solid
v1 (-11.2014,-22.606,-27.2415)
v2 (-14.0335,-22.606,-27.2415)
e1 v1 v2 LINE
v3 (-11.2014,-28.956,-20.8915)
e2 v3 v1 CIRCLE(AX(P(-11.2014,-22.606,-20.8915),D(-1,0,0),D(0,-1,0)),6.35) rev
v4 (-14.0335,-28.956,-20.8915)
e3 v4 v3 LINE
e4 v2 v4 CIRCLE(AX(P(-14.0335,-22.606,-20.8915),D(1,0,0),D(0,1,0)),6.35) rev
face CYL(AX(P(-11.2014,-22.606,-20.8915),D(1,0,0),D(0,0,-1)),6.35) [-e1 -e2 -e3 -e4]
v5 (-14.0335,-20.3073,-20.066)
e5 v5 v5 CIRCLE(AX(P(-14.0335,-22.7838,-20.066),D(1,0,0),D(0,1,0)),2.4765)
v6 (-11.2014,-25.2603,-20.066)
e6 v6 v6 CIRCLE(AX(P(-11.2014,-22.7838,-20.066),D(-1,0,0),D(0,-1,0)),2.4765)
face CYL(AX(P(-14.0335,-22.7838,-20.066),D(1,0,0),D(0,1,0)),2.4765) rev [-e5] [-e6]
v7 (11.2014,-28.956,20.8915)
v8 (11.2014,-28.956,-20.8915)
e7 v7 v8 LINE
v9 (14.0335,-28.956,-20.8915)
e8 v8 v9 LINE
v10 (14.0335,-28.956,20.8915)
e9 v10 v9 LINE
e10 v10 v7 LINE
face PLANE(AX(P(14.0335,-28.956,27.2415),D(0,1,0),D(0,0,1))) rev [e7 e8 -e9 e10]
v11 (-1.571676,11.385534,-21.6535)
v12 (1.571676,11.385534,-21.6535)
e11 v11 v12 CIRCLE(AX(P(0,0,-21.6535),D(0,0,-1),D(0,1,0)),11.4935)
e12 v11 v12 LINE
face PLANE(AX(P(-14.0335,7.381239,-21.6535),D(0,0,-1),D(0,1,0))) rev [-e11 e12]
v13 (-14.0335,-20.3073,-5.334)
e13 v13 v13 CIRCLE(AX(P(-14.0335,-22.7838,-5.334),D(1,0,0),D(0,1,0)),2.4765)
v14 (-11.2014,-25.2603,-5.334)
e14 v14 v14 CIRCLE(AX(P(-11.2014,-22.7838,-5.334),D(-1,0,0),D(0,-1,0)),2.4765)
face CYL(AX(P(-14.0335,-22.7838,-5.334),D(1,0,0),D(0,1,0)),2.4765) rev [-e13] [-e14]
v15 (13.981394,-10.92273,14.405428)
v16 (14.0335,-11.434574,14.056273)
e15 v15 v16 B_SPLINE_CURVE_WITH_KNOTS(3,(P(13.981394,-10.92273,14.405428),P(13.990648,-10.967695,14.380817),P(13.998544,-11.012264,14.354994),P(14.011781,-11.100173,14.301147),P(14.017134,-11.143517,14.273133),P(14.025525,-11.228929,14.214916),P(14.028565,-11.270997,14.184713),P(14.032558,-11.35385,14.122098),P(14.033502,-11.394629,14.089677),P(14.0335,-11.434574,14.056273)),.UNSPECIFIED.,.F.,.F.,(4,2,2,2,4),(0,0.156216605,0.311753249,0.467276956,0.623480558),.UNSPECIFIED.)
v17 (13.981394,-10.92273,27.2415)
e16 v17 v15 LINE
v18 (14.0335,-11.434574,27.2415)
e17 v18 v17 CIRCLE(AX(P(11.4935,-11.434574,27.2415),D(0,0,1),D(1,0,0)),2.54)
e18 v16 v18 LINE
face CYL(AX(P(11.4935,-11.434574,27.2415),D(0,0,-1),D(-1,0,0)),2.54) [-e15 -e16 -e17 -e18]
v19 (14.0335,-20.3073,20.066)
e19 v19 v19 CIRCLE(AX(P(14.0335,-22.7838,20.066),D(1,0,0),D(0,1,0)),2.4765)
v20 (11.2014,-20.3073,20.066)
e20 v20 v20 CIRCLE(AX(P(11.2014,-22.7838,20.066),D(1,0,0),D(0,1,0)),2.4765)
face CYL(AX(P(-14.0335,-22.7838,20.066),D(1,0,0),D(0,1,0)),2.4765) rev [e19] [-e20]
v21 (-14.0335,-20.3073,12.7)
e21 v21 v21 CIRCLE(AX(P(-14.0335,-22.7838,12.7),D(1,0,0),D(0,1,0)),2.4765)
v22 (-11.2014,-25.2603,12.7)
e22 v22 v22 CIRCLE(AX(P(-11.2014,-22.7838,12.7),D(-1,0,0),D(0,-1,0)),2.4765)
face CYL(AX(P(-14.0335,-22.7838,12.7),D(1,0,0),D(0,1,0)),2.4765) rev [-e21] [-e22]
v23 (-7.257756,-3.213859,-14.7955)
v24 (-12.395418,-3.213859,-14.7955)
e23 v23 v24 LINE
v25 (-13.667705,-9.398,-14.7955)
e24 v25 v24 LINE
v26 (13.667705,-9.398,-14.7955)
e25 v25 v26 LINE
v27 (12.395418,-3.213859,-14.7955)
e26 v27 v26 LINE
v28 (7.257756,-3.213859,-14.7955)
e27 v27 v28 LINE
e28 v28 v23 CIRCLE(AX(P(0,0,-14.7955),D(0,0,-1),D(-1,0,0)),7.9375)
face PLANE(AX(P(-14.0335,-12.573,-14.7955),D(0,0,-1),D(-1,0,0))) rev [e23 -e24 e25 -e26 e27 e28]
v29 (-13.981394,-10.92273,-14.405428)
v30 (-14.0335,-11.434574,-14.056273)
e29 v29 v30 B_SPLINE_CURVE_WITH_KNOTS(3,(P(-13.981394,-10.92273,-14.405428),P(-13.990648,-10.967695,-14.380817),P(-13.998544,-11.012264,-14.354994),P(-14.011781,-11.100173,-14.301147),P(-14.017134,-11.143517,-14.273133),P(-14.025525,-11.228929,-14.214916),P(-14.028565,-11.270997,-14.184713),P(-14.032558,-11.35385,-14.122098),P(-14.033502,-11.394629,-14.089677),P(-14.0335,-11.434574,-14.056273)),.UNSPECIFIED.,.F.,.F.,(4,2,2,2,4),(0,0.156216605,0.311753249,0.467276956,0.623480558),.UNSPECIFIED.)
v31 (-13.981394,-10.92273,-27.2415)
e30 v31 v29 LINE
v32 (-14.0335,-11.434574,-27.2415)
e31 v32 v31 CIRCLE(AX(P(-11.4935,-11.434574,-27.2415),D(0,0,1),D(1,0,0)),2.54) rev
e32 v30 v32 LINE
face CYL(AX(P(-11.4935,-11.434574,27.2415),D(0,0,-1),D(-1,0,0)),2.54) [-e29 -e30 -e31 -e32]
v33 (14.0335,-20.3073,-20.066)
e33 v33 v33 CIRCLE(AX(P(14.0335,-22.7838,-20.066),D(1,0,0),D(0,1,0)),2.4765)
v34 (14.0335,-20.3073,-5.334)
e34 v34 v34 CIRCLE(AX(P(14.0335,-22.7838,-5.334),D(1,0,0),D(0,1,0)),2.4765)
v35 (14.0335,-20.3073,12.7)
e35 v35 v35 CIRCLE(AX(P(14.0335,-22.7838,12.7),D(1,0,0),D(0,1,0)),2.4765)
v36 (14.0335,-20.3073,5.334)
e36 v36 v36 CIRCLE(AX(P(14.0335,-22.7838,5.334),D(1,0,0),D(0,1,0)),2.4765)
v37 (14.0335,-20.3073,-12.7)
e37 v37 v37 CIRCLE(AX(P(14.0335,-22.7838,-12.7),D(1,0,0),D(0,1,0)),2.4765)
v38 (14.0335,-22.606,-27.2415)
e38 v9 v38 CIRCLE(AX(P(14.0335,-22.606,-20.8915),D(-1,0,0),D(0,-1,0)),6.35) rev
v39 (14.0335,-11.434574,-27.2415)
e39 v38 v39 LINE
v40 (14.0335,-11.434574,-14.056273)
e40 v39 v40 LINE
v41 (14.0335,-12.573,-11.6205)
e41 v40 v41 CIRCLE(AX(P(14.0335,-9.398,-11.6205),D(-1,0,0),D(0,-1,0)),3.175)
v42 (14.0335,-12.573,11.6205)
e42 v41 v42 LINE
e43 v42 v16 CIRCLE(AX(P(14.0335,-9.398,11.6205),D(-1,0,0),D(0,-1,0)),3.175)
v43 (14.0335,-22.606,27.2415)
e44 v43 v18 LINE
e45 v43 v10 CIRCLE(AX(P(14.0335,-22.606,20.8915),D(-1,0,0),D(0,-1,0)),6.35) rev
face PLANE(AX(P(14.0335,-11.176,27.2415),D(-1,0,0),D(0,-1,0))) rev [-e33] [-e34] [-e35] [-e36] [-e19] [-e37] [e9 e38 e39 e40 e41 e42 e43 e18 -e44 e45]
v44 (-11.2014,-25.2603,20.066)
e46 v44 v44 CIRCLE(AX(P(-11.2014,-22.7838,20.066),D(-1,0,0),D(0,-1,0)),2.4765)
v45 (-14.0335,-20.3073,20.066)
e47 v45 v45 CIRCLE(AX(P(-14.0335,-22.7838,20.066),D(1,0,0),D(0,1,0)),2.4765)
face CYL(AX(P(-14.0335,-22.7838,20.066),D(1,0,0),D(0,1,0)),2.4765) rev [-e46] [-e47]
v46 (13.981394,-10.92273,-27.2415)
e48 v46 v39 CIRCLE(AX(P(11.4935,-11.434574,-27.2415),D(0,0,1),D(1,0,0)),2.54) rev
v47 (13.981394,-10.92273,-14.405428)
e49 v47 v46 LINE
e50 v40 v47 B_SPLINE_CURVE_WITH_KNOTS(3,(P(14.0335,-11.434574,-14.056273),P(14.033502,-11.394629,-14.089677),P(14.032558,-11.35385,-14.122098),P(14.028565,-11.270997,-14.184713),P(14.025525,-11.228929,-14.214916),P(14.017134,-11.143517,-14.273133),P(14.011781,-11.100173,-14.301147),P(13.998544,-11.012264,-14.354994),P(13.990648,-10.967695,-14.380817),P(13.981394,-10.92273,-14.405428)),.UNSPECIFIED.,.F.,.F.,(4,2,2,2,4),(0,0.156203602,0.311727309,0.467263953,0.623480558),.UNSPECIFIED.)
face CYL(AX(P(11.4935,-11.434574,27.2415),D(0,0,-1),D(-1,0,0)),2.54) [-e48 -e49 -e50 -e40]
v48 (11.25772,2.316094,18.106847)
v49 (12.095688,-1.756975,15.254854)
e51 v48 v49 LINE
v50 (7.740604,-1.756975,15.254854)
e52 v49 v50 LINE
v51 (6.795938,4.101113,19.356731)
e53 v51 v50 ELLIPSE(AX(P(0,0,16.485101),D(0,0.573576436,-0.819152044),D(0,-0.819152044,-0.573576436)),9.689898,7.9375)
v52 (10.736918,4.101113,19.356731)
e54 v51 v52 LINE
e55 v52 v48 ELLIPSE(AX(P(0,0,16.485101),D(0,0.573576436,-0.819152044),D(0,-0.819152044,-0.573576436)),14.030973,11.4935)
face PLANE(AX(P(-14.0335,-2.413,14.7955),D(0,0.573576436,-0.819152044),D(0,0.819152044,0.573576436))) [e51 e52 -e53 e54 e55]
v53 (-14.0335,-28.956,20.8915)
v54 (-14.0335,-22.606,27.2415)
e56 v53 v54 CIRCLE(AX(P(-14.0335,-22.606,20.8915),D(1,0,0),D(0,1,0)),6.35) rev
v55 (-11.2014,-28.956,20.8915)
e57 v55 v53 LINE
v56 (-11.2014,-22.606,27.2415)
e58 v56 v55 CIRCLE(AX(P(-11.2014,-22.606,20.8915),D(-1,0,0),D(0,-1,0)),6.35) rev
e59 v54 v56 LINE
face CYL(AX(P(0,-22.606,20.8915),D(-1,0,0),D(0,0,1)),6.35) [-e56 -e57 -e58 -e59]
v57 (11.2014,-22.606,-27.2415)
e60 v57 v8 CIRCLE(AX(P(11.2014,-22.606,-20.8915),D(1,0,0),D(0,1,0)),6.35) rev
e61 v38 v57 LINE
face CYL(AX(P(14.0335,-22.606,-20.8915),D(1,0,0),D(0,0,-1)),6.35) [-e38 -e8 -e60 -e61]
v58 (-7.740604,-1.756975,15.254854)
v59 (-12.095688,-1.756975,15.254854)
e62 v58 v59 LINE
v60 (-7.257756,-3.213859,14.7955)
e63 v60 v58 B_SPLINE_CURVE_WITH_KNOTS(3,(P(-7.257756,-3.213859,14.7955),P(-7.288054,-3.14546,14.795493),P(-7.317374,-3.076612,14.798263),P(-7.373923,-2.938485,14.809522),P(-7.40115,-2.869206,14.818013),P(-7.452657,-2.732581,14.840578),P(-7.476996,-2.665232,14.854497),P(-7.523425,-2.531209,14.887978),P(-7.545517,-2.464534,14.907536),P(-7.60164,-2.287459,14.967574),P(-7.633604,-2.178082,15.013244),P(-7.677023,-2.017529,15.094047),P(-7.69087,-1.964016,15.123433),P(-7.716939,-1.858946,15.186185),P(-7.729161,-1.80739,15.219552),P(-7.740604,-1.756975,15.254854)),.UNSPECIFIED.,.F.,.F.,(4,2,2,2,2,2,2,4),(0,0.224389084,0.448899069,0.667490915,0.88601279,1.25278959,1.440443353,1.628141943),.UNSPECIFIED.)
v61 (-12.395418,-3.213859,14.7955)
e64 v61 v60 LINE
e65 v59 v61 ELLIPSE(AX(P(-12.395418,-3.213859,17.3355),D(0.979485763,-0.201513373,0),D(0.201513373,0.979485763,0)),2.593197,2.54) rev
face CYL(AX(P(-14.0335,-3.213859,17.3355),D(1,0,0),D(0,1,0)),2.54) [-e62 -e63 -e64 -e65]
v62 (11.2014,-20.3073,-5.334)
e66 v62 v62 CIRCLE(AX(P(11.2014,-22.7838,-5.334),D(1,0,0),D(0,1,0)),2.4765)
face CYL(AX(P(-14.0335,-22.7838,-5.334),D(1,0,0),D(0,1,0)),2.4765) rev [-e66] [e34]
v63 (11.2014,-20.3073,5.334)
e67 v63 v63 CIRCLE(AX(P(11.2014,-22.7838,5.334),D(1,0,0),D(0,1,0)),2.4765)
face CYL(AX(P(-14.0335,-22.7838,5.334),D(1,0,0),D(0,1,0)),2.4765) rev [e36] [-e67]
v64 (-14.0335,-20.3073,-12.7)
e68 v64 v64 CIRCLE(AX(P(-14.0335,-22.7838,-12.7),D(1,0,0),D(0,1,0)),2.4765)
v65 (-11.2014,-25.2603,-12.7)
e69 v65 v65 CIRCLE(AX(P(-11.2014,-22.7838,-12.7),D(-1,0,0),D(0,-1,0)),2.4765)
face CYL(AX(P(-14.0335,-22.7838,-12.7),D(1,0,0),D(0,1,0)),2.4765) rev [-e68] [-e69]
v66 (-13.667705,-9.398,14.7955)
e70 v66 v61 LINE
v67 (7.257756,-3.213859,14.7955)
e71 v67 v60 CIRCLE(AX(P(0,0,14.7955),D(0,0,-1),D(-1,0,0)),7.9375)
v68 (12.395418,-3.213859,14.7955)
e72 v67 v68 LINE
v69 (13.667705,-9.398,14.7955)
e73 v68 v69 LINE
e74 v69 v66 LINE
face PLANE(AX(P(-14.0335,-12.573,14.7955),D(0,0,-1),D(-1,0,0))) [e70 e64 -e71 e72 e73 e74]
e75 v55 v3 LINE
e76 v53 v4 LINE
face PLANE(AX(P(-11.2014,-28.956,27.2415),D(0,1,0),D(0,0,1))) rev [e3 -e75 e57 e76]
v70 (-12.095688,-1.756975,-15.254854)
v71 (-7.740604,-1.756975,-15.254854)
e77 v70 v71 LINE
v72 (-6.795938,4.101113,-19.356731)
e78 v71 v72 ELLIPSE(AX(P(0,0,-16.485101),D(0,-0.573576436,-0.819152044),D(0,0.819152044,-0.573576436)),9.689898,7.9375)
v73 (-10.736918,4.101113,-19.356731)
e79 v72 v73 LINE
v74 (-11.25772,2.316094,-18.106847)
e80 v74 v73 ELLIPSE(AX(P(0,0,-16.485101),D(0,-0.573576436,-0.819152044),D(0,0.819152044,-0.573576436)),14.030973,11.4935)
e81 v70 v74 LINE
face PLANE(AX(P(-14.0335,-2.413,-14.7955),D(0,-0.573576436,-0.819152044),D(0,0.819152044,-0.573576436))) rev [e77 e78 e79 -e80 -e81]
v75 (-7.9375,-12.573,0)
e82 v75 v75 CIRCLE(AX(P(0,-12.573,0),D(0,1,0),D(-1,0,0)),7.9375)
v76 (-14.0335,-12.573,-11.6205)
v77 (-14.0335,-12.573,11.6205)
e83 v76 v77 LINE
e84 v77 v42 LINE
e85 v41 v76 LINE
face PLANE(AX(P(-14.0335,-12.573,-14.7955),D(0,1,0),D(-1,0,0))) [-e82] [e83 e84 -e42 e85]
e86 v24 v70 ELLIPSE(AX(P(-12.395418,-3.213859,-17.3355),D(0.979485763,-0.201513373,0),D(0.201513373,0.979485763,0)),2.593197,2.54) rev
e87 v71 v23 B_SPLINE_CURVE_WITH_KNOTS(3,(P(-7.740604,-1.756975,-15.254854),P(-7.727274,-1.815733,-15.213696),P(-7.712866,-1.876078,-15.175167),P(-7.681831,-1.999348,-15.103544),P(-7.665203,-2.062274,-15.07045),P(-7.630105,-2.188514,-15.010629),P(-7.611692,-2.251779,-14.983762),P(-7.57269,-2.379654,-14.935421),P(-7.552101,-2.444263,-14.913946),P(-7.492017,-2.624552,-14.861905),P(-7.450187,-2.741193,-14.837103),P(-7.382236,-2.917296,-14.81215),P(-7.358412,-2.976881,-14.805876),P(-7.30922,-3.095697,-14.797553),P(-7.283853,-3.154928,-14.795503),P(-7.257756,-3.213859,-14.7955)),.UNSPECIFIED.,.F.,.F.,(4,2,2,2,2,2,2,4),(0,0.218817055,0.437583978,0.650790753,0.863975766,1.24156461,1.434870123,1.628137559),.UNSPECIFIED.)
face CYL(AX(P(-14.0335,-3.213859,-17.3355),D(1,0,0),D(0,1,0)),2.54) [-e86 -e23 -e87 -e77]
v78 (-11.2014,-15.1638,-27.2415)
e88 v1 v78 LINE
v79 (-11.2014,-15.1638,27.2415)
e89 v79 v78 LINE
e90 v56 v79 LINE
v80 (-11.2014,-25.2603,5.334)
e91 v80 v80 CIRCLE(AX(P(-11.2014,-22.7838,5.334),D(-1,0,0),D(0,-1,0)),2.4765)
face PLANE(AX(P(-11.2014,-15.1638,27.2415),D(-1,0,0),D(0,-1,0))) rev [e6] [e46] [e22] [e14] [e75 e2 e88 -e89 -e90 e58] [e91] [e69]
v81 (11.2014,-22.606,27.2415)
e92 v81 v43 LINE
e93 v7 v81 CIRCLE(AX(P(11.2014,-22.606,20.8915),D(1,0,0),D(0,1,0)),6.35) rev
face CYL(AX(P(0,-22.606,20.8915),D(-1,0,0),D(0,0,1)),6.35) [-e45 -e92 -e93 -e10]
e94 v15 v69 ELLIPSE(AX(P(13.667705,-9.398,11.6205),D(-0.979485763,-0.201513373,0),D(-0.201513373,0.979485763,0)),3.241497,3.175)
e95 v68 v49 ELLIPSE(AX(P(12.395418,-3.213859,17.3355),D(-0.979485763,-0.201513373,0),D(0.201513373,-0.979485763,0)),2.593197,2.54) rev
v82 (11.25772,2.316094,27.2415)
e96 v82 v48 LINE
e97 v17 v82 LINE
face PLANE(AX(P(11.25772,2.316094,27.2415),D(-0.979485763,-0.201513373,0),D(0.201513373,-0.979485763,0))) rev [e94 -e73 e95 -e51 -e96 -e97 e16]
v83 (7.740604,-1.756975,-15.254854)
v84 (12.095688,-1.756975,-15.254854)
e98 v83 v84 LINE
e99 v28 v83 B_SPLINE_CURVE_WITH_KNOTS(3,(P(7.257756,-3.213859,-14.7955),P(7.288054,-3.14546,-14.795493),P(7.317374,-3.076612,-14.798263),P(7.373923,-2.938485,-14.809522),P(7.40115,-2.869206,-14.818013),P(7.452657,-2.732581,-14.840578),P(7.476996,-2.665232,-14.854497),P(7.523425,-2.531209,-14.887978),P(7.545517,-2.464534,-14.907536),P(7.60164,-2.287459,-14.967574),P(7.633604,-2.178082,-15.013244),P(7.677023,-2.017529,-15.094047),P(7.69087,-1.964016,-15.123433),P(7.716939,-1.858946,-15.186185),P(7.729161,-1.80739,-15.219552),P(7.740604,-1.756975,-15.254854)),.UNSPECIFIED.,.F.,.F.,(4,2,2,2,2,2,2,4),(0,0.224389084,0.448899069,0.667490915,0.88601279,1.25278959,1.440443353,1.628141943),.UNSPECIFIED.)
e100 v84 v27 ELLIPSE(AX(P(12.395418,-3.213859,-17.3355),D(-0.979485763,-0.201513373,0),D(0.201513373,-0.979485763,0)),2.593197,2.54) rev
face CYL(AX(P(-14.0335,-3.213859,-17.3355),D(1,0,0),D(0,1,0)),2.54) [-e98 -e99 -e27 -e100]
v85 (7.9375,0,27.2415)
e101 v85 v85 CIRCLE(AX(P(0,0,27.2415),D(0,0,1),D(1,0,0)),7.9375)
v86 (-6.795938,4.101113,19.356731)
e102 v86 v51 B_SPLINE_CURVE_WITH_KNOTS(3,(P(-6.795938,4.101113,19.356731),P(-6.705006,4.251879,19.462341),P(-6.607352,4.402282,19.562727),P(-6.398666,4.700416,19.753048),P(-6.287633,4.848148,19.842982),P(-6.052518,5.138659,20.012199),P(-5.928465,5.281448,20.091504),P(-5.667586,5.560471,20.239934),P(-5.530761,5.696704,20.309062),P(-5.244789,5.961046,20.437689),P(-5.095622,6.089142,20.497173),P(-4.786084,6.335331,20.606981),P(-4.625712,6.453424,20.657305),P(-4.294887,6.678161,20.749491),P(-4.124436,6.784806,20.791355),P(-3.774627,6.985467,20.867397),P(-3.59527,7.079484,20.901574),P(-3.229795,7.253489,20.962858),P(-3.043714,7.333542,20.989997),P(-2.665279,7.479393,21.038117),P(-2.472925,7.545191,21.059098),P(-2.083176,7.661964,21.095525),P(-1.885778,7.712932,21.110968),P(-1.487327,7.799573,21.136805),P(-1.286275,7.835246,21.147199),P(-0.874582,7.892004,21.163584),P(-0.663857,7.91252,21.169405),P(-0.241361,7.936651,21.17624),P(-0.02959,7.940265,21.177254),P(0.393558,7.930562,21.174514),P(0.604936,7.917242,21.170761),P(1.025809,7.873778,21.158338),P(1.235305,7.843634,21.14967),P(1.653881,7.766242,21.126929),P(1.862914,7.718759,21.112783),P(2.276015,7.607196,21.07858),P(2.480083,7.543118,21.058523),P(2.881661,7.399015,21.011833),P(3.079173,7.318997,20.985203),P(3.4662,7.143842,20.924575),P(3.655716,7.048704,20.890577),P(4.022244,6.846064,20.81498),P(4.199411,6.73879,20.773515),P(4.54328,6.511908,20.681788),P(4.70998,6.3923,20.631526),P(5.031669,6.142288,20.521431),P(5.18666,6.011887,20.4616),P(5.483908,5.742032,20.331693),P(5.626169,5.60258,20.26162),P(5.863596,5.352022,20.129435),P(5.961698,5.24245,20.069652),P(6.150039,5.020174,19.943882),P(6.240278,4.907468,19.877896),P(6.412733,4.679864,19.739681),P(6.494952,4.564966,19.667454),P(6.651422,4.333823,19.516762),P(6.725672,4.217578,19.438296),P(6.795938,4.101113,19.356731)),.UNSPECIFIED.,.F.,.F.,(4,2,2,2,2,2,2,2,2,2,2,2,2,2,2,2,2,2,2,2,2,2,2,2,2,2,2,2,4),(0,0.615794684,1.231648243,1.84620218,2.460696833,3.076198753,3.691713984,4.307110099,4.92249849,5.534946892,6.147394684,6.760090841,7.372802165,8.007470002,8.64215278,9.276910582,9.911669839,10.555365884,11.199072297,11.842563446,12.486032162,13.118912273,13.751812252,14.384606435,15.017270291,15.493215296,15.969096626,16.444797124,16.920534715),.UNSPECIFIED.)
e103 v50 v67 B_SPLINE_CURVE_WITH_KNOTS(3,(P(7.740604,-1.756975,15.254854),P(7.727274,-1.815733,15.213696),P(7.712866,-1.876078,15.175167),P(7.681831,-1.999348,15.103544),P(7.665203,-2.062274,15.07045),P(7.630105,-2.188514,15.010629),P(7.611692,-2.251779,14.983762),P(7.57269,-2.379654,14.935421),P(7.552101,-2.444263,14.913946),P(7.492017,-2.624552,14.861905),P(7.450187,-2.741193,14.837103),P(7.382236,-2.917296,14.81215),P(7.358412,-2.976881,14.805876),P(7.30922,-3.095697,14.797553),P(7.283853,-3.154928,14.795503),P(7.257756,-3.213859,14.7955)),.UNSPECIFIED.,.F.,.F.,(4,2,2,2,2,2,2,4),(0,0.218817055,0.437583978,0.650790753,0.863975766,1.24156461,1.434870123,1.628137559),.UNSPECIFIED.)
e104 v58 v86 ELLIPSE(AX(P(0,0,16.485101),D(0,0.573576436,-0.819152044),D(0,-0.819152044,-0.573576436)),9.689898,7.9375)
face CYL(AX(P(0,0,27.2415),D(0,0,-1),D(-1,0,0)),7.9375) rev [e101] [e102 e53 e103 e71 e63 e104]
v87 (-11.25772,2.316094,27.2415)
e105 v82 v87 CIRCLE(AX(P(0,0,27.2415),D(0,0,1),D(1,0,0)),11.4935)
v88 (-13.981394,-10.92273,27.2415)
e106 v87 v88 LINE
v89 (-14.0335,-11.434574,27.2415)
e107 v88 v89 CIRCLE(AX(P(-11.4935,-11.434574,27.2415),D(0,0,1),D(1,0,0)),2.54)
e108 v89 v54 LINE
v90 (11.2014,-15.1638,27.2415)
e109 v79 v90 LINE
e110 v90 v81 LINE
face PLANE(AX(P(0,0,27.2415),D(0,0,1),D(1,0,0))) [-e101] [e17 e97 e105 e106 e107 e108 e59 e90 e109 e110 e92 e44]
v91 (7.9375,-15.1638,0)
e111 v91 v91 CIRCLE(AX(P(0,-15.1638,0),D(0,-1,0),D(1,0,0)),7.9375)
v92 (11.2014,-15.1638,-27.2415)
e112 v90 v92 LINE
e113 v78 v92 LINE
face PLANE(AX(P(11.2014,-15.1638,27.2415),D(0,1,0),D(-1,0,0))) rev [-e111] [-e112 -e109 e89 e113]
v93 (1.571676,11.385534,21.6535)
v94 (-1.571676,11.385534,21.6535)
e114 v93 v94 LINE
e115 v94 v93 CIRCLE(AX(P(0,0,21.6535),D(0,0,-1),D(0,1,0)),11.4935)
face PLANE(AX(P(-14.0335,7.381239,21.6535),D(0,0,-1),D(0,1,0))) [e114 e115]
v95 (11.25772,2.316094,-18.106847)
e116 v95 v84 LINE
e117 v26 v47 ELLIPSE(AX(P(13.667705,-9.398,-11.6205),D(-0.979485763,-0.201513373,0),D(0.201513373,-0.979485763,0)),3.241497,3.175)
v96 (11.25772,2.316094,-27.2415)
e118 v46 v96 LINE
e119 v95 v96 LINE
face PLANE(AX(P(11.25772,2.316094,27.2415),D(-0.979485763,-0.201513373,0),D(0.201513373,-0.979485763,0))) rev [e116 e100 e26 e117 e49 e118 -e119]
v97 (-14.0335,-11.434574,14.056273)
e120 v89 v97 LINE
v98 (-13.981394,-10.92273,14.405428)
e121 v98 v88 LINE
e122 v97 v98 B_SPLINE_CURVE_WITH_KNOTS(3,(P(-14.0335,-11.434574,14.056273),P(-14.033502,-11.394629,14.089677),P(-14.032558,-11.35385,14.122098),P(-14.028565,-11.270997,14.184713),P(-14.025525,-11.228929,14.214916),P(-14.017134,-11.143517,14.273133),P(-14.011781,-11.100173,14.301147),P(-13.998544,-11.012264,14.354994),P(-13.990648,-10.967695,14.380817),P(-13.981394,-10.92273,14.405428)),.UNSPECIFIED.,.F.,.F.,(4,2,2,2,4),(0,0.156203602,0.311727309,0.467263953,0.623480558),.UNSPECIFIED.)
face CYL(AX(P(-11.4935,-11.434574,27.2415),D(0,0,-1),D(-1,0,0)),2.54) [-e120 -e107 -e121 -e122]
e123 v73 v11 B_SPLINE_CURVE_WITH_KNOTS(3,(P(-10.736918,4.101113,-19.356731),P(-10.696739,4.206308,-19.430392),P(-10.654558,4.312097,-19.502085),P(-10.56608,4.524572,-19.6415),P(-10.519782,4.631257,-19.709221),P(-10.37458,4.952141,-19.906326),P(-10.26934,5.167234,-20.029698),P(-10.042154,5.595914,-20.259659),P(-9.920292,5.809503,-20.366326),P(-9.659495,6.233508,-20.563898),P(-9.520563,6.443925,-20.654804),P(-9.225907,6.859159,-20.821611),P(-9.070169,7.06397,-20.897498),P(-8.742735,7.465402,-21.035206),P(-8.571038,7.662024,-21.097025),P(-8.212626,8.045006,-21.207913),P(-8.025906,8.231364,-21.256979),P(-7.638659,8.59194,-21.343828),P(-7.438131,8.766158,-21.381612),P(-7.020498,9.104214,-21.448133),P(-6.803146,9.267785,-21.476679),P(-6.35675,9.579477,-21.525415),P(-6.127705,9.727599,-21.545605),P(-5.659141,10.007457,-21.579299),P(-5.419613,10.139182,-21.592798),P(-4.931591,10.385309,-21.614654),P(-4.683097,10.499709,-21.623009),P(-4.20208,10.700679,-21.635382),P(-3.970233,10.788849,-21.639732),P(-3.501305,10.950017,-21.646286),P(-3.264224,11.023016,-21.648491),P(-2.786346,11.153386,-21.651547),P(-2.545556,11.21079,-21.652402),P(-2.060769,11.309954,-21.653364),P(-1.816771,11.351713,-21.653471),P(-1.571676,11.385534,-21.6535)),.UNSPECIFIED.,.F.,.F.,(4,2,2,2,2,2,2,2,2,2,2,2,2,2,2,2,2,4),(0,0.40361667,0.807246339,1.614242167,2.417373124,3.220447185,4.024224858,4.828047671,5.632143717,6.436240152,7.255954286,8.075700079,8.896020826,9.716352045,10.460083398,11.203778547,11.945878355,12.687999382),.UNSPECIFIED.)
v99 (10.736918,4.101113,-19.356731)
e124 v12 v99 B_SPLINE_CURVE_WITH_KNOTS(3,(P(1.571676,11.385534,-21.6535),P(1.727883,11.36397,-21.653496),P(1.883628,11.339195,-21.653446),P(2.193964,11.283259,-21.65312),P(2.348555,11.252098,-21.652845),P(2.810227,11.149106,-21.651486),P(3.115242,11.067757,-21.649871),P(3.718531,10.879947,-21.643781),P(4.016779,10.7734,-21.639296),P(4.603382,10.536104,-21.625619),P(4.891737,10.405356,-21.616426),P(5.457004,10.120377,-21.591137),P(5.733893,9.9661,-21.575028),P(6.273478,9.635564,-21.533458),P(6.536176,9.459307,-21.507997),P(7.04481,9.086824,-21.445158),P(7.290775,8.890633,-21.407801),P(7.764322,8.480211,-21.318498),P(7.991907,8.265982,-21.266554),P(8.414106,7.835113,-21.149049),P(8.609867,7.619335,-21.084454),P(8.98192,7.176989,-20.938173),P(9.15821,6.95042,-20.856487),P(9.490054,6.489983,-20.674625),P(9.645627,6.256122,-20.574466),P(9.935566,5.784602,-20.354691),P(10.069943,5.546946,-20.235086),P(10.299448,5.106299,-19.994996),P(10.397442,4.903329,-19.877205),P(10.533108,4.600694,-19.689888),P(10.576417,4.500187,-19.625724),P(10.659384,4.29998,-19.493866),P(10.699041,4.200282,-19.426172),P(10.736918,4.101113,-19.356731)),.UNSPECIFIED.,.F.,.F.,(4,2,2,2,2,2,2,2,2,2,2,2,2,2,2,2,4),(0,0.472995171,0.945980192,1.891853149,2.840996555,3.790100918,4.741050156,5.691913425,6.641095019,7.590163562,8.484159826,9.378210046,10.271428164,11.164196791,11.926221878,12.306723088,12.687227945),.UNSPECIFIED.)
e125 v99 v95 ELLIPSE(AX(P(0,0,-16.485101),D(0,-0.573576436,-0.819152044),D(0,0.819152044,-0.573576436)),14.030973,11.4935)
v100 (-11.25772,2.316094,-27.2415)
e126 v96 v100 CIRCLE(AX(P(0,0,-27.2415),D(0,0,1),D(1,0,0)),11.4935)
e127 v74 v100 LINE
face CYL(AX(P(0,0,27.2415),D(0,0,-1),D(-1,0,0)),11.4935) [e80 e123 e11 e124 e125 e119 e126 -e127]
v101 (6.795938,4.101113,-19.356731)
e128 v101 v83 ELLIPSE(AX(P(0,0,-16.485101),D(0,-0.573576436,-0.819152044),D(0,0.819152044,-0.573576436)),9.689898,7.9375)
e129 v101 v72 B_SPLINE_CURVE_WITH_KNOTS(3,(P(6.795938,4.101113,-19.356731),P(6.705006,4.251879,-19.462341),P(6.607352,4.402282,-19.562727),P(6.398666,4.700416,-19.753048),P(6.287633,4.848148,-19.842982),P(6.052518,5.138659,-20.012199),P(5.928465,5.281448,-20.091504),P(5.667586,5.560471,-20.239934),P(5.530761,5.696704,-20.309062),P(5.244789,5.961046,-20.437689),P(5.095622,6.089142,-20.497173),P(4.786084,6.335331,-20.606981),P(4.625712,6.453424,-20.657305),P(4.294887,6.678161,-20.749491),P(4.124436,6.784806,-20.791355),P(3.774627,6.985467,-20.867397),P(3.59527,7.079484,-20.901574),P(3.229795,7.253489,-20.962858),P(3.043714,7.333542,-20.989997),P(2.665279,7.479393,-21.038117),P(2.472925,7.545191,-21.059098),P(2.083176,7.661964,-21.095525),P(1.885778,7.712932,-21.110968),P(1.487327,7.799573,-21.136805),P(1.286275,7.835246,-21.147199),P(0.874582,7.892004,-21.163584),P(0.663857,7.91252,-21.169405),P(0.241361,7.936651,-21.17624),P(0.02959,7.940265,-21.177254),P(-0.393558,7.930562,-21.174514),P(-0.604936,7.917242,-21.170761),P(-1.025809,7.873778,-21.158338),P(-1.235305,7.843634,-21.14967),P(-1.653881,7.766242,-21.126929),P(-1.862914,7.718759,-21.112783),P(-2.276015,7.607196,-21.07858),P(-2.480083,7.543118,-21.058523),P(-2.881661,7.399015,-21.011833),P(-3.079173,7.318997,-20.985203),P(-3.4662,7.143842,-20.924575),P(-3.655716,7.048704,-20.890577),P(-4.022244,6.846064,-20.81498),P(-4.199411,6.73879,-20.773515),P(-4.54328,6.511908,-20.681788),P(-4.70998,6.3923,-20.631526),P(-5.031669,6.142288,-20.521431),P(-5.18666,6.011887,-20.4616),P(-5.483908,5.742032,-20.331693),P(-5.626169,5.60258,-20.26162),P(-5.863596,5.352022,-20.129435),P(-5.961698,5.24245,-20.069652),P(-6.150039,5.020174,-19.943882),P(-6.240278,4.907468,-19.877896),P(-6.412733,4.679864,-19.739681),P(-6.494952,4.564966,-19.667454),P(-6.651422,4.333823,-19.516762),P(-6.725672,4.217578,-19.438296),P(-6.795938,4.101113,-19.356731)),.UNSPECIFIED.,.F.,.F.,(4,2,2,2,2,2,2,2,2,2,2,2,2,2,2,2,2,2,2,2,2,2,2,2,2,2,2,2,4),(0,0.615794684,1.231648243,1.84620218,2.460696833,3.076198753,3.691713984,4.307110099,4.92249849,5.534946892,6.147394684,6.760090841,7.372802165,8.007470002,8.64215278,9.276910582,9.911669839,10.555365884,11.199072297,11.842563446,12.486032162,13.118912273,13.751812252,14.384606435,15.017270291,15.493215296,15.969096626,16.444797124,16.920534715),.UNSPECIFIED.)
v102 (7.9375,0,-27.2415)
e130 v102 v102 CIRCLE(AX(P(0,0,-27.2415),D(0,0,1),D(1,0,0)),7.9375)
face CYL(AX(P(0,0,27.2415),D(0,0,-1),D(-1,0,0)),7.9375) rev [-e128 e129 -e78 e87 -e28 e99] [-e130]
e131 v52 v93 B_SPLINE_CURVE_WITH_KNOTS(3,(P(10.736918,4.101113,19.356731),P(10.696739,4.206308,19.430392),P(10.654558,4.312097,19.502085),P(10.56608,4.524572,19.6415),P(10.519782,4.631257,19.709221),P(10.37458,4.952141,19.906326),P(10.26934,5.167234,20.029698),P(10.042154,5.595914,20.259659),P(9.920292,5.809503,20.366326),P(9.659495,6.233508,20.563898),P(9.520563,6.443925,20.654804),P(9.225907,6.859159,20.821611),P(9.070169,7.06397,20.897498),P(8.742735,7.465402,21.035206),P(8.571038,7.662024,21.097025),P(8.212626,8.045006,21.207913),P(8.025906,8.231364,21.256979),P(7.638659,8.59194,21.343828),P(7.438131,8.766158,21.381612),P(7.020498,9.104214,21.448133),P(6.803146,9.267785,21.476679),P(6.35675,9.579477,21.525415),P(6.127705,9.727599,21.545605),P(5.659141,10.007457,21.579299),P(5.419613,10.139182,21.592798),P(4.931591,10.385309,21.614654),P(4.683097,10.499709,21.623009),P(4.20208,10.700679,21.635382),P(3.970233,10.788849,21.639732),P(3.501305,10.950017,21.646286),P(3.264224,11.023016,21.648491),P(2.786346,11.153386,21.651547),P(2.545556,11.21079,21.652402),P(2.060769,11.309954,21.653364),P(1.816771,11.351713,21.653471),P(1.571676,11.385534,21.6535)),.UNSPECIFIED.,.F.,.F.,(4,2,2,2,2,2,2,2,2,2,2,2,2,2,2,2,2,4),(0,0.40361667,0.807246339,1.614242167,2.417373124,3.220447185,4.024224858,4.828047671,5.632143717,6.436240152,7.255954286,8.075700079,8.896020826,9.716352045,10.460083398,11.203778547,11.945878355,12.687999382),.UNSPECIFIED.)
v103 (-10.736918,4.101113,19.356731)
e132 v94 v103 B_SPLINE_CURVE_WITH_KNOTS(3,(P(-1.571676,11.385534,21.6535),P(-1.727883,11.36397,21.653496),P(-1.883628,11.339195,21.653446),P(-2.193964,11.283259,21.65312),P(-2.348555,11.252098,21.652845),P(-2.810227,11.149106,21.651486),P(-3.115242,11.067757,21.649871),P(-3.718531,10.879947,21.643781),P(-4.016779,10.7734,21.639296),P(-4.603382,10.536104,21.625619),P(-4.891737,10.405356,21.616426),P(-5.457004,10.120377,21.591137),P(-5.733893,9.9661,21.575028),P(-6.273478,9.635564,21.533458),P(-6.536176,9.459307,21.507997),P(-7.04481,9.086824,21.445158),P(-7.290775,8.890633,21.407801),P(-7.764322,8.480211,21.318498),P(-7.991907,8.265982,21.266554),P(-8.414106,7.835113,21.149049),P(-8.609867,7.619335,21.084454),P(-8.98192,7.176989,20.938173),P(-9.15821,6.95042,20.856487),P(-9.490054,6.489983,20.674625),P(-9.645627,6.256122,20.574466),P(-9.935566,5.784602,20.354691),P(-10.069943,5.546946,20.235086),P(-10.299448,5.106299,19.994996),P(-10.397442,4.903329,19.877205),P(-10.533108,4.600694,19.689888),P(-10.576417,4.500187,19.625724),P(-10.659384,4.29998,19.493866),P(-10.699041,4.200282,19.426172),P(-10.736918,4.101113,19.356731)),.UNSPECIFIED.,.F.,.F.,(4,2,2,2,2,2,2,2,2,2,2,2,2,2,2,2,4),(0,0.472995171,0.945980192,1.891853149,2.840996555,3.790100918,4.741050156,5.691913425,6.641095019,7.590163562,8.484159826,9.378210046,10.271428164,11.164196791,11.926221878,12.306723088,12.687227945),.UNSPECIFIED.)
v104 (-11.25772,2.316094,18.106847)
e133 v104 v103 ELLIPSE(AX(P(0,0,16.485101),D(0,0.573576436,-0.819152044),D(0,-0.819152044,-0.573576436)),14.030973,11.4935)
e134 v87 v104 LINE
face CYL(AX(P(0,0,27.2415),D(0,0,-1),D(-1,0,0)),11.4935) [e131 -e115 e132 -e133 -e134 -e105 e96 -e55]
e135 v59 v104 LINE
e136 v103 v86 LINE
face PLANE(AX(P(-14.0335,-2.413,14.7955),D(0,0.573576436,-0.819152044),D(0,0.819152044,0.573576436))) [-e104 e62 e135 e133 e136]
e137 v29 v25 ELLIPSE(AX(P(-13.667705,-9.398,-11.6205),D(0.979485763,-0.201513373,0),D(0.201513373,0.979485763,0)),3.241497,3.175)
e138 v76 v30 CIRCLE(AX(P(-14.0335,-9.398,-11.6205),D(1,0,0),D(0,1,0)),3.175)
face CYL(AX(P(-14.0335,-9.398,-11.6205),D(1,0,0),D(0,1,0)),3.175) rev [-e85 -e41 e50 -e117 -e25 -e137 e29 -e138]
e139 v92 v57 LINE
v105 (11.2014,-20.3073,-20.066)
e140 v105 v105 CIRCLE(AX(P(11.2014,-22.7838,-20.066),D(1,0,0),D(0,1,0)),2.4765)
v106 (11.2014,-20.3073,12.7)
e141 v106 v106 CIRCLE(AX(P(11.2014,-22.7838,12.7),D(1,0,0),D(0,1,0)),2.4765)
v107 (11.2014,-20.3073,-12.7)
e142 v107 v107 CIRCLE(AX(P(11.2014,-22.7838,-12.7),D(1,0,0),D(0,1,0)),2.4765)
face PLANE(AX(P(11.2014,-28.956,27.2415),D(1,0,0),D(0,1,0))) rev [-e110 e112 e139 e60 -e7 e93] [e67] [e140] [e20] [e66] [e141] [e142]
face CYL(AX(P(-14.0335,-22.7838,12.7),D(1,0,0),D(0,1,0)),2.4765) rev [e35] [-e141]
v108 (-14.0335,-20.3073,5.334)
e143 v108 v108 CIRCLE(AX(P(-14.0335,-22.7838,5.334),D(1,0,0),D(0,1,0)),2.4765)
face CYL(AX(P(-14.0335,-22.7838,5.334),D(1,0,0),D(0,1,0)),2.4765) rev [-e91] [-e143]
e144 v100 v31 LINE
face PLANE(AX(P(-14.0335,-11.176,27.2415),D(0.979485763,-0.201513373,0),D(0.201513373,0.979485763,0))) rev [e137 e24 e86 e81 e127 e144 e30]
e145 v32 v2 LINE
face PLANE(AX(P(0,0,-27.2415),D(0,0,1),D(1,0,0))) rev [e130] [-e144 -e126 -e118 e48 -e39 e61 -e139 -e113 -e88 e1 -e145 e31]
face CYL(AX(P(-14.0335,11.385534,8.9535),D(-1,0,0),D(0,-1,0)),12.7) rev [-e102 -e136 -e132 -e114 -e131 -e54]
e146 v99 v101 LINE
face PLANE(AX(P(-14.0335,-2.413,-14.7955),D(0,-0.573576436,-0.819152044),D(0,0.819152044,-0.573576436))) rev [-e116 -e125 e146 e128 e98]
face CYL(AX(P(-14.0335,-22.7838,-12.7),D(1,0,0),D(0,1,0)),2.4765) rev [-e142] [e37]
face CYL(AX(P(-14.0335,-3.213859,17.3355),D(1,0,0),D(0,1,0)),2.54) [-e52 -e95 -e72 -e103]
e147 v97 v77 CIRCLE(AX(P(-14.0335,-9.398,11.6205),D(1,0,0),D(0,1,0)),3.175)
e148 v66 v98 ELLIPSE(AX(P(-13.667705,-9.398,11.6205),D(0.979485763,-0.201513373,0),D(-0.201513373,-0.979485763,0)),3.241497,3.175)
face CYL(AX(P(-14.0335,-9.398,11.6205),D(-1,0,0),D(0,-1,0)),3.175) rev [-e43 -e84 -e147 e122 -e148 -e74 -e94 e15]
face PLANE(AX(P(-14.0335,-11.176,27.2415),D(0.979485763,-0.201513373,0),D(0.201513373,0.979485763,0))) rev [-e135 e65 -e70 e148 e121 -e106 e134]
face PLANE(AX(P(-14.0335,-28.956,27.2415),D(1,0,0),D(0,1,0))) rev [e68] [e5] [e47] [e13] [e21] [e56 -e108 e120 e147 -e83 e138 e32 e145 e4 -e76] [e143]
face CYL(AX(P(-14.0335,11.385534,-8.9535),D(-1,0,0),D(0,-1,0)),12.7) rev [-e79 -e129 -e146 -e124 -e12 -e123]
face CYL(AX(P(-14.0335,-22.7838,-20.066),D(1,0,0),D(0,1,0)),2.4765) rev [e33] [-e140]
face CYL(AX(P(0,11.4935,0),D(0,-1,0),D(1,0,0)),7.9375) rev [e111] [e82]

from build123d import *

# Parameters (mm, degrees)
SKETCH1_R           = 7.9375
BOSS_EXTRUDE1_DEPTH = 27.2415
SKETCH2_R           = 2.4765
CUT_EXTRUDE1_DEPTH  = 49.665241675
CUT_EXTRUDE2_DEPTH  = 49.665241675
SKETCH4_R           = 7.9375
CUT_EXTRUDE3_DEPTH  = 41.615884673
FILLET1_R           = 6.35
FILLET2_R           = 3.175
FILLET3_R           = 12.7
FILLET4_R           = 2.54
FILLET5_R           = 2.54


with BuildPart() as part:
    # Sketch1 → Boss-Extrude1 (new, symmetric)
    with BuildSketch(Plane.XY):
        with BuildLine():
            Line((11.25771962, 2.316093955), (14.0335, -11.176))
            Line((14.0335, -11.176), (14.0335, -28.956))
            Line((14.0335, -28.956), (11.2014, -28.956))
            Line((11.2014, -28.956), (11.2014, -15.1638))
            Line((11.2014, -15.1638), (-11.2014, -15.1638))
            Line((-11.2014, -15.1638), (-11.2014, -28.956))
            Line((-11.2014, -28.956), (-14.0335, -28.956))
            Line((-14.0335, -28.956), (-14.0335, -11.176))
            Line((-14.0335, -11.176), (-11.25771962, 2.316093955))
            ThreePointArc((-11.25771962, 2.316093955), (0, 11.4935), (11.25771962, 2.316093955))
        make_face()
        Circle(SKETCH1_R, mode=Mode.SUBTRACT)
    extrude(amount=BOSS_EXTRUDE1_DEPTH, both=True)

    # Sketch2 → Cut-Extrude1 (cut, through all)
    with BuildSketch(Plane(origin=(14.0335, 0, 0), x_dir=(0, 0, -1), z_dir=(1, 0, 0))):
        with Locations(Location((-20.066, -22.7838, 0), (0, 0, 90))):
            Circle(SKETCH2_R)
        with Locations(Location((-12.7, -22.7838, 0), (0, 0, 90))):
            Circle(SKETCH2_R)
        with Locations(Location((-5.334, -22.7838, 0), (0, 0, 90))):
            Circle(SKETCH2_R)
        with Locations(Location((5.334, -22.7838, 0), (0, 0, 90))):
            Circle(SKETCH2_R)
        with Locations(Location((12.7, -22.7838, 0), (0, 0, 90))):
            Circle(SKETCH2_R)
        with Locations(Location((20.066, -22.7838, 0), (0, 0, 90))):
            Circle(SKETCH2_R)
    extrude(amount=-CUT_EXTRUDE1_DEPTH, mode=Mode.SUBTRACT)

    # Sketch3 → Cut-Extrude2 (cut, through all)
    with BuildSketch(Plane(origin=(14.0335, 0, 0), x_dir=(0, 0, -1), z_dir=(1, 0, 0))):
        Polygon((14.7955, -12.573), (-14.7955, -12.573), (-14.7955, -2.413), (-21.6535, 7.38123903), (-21.6535, 11.4935), (21.6535, 11.4935), (21.6535, 7.38123903), (14.7955, -2.413), align=None)
    extrude(amount=-CUT_EXTRUDE2_DEPTH, mode=Mode.SUBTRACT)

    # Sketch4 → Cut-Extrude3 (cut, through all)
    with BuildSketch(Plane.XZ.offset(15.1638)):
        Circle(SKETCH4_R)
    extrude(amount=-CUT_EXTRUDE3_DEPTH, mode=Mode.SUBTRACT)

    # Fillet1
    fillet1_edges = [part.edges().sort_by_distance(p)[0] for p in [
        (12.61745, -28.956, -27.2415),
        (-12.61745, -28.956, -27.2415),
        (-12.61745, -28.956, 27.2415),
        (12.61745, -28.956, 27.2415),
    ]]
    fillet(fillet1_edges, radius=FILLET1_R)

    # Fillet2
    fillet2_edges = [part.edges().sort_by_distance(p)[0] for p in [
        (0, -12.573, 14.7955),
        (0, -12.573, -14.7955),
    ]]
    fillet(fillet2_edges, radius=FILLET2_R)

    # Fillet3
    # the kernel refuses this fillet: 12.7 mm, written as the material it adds along each edge
    with BuildSketch(Plane(origin=(18.820836014, 7.38123903, 21.6535), x_dir=(0, -0.8191520442889931, -0.5735764363510439), z_dir=(-1, 0, 0))) as fillet3_piece_1_section:
        with BuildLine():
            CenterArc((FILLET3_R * 0.315298788879, -FILLET3_R), FILLET3_R, 90, 35)
            Line((-FILLET3_R * 0.258277647472, -FILLET3_R * 0.180847955711), (0, 0))
            Line((0, 0), (FILLET3_R * 0.315298788879, 0))
        make_face()
    fillet3_piece_1 = extrude(amount=25.91246026, mode=Mode.PRIVATE)
    fillet3_piece_1 = fillet3_piece_1 & Plane(origin=(0, 0, 21.359418529), x_dir=(-0.9794857632595162, 0.20151337318382392, 0), z_dir=(0, 0, 1)) * Cylinder(11.4935, 68, mode=Mode.PRIVATE)
    fillet3_piece_1 = fillet3_piece_1 - Plane(origin=(0, 0, 21.359418529), x_dir=(1, 0, 0), z_dir=(0, 0, -1)) * Cylinder(7.9375, 68, mode=Mode.PRIVATE)
    add(fillet3_piece_1)
    with BuildSketch(Plane(origin=(7.091624245, 7.38123903, 21.6535), x_dir=(0, -0.8191520442889934, -0.5735764363510438), z_dir=(-1, 0, 0))) as fillet3_piece_2_section:
        with BuildLine():
            CenterArc((FILLET3_R * 0.315298788879, -FILLET3_R), FILLET3_R, 90, 35)
            Line((-FILLET3_R * 0.258277647472, -FILLET3_R * 0.180847955711), (0, 0))
            Line((0, 0), (FILLET3_R * 0.315298788879, 0))
        make_face()
    fillet3_piece_2 = extrude(amount=25.91246026, mode=Mode.PRIVATE)
    fillet3_piece_2 = fillet3_piece_2 & Plane(origin=(0, 0, 21.359421055), x_dir=(-0.9794857632595162, 0.20151337318382392, 0), z_dir=(0, 0, 1)) * Cylinder(11.4935, 68, mode=Mode.PRIVATE)
    fillet3_piece_2 = fillet3_piece_2 - Plane(origin=(0, 0, 21.359421055), x_dir=(1, 0, 0), z_dir=(0, 0, -1)) * Cylinder(7.9375, 68, mode=Mode.PRIVATE)
    add(fillet3_piece_2)
    with BuildSketch(Plane(origin=(7.091624245, 7.38123903, -21.6535), x_dir=(0, -0.819152044288993, 0.5735764363510443), z_dir=(-1, 0, 0))) as fillet3_piece_3_section:
        with BuildLine():
            CenterArc((FILLET3_R * 0.315298788879, FILLET3_R), FILLET3_R, 235, 35)
            Line((-FILLET3_R * 0.258277647472, FILLET3_R * 0.180847955711), (0, 0))
            Line((0, 0), (FILLET3_R * 0.315298788879, 0))
        make_face()
    fillet3_piece_3 = extrude(amount=25.91246026, mode=Mode.PRIVATE)
    fillet3_piece_3 = fillet3_piece_3 - Plane(origin=(0, 0, -21.359421055), x_dir=(1, 0, 0), z_dir=(0, 0, -1)) * Cylinder(7.9375, 68, mode=Mode.PRIVATE)
    fillet3_piece_3 = fillet3_piece_3 & Plane(origin=(0, 0, -21.359421055), x_dir=(-0.9794857632595162, 0.20151337318382392, 0), z_dir=(0, 0, 1)) * Cylinder(11.4935, 68, mode=Mode.PRIVATE)
    add(fillet3_piece_3)
    with BuildSketch(Plane(origin=(18.820836014, 7.38123903, -21.6535), x_dir=(0, -0.8191520442889931, 0.5735764363510439), z_dir=(-1, 0, 0))) as fillet3_piece_4_section:
        with BuildLine():
            CenterArc((FILLET3_R * 0.315298788879, FILLET3_R), FILLET3_R, 235, 35)
            Line((-FILLET3_R * 0.258277647472, FILLET3_R * 0.180847955711), (0, 0))
            Line((0, 0), (FILLET3_R * 0.315298788879, 0))
        make_face()
    fillet3_piece_4 = extrude(amount=25.91246026, mode=Mode.PRIVATE)
    fillet3_piece_4 = fillet3_piece_4 & Plane(origin=(0, 0, -21.359418529), x_dir=(-0.9794857632595162, 0.20151337318382392, 0), z_dir=(0, 0, 1)) * Cylinder(11.4935, 68, mode=Mode.PRIVATE)
    fillet3_piece_4 = fillet3_piece_4 - Plane(origin=(0, 0, -21.359418529), x_dir=(1, 0, 0), z_dir=(0, 0, -1)) * Cylinder(7.9375, 68, mode=Mode.PRIVATE)
    add(fillet3_piece_4)

    # Fillet4
    fillet4_edges = [part.edges().sort_by_distance(p)[0] for p in [
        (9.89624428, -2.413, -14.7955),
        (-9.89624428, -2.413, -14.7955),
        (-9.89624428, -2.413, 14.7955),
        (9.89624428, -2.413, 14.7955),
    ]]
    fillet(fillet4_edges, radius=FILLET4_R)

    # Fillet5
    fillet5_edges = [part.edges().sort_by_distance(p)[0] for p in [
        (-14.0335, -11.176, 20.746232014),
        (-14.0335, -11.176, -20.746232014),
        (14.0335, -11.176, -20.746232014),
        (14.0335, -11.176, 20.746232014),
    ]]
    fillet(fillet5_edges, radius=FILLET5_R)


solid = part.part
